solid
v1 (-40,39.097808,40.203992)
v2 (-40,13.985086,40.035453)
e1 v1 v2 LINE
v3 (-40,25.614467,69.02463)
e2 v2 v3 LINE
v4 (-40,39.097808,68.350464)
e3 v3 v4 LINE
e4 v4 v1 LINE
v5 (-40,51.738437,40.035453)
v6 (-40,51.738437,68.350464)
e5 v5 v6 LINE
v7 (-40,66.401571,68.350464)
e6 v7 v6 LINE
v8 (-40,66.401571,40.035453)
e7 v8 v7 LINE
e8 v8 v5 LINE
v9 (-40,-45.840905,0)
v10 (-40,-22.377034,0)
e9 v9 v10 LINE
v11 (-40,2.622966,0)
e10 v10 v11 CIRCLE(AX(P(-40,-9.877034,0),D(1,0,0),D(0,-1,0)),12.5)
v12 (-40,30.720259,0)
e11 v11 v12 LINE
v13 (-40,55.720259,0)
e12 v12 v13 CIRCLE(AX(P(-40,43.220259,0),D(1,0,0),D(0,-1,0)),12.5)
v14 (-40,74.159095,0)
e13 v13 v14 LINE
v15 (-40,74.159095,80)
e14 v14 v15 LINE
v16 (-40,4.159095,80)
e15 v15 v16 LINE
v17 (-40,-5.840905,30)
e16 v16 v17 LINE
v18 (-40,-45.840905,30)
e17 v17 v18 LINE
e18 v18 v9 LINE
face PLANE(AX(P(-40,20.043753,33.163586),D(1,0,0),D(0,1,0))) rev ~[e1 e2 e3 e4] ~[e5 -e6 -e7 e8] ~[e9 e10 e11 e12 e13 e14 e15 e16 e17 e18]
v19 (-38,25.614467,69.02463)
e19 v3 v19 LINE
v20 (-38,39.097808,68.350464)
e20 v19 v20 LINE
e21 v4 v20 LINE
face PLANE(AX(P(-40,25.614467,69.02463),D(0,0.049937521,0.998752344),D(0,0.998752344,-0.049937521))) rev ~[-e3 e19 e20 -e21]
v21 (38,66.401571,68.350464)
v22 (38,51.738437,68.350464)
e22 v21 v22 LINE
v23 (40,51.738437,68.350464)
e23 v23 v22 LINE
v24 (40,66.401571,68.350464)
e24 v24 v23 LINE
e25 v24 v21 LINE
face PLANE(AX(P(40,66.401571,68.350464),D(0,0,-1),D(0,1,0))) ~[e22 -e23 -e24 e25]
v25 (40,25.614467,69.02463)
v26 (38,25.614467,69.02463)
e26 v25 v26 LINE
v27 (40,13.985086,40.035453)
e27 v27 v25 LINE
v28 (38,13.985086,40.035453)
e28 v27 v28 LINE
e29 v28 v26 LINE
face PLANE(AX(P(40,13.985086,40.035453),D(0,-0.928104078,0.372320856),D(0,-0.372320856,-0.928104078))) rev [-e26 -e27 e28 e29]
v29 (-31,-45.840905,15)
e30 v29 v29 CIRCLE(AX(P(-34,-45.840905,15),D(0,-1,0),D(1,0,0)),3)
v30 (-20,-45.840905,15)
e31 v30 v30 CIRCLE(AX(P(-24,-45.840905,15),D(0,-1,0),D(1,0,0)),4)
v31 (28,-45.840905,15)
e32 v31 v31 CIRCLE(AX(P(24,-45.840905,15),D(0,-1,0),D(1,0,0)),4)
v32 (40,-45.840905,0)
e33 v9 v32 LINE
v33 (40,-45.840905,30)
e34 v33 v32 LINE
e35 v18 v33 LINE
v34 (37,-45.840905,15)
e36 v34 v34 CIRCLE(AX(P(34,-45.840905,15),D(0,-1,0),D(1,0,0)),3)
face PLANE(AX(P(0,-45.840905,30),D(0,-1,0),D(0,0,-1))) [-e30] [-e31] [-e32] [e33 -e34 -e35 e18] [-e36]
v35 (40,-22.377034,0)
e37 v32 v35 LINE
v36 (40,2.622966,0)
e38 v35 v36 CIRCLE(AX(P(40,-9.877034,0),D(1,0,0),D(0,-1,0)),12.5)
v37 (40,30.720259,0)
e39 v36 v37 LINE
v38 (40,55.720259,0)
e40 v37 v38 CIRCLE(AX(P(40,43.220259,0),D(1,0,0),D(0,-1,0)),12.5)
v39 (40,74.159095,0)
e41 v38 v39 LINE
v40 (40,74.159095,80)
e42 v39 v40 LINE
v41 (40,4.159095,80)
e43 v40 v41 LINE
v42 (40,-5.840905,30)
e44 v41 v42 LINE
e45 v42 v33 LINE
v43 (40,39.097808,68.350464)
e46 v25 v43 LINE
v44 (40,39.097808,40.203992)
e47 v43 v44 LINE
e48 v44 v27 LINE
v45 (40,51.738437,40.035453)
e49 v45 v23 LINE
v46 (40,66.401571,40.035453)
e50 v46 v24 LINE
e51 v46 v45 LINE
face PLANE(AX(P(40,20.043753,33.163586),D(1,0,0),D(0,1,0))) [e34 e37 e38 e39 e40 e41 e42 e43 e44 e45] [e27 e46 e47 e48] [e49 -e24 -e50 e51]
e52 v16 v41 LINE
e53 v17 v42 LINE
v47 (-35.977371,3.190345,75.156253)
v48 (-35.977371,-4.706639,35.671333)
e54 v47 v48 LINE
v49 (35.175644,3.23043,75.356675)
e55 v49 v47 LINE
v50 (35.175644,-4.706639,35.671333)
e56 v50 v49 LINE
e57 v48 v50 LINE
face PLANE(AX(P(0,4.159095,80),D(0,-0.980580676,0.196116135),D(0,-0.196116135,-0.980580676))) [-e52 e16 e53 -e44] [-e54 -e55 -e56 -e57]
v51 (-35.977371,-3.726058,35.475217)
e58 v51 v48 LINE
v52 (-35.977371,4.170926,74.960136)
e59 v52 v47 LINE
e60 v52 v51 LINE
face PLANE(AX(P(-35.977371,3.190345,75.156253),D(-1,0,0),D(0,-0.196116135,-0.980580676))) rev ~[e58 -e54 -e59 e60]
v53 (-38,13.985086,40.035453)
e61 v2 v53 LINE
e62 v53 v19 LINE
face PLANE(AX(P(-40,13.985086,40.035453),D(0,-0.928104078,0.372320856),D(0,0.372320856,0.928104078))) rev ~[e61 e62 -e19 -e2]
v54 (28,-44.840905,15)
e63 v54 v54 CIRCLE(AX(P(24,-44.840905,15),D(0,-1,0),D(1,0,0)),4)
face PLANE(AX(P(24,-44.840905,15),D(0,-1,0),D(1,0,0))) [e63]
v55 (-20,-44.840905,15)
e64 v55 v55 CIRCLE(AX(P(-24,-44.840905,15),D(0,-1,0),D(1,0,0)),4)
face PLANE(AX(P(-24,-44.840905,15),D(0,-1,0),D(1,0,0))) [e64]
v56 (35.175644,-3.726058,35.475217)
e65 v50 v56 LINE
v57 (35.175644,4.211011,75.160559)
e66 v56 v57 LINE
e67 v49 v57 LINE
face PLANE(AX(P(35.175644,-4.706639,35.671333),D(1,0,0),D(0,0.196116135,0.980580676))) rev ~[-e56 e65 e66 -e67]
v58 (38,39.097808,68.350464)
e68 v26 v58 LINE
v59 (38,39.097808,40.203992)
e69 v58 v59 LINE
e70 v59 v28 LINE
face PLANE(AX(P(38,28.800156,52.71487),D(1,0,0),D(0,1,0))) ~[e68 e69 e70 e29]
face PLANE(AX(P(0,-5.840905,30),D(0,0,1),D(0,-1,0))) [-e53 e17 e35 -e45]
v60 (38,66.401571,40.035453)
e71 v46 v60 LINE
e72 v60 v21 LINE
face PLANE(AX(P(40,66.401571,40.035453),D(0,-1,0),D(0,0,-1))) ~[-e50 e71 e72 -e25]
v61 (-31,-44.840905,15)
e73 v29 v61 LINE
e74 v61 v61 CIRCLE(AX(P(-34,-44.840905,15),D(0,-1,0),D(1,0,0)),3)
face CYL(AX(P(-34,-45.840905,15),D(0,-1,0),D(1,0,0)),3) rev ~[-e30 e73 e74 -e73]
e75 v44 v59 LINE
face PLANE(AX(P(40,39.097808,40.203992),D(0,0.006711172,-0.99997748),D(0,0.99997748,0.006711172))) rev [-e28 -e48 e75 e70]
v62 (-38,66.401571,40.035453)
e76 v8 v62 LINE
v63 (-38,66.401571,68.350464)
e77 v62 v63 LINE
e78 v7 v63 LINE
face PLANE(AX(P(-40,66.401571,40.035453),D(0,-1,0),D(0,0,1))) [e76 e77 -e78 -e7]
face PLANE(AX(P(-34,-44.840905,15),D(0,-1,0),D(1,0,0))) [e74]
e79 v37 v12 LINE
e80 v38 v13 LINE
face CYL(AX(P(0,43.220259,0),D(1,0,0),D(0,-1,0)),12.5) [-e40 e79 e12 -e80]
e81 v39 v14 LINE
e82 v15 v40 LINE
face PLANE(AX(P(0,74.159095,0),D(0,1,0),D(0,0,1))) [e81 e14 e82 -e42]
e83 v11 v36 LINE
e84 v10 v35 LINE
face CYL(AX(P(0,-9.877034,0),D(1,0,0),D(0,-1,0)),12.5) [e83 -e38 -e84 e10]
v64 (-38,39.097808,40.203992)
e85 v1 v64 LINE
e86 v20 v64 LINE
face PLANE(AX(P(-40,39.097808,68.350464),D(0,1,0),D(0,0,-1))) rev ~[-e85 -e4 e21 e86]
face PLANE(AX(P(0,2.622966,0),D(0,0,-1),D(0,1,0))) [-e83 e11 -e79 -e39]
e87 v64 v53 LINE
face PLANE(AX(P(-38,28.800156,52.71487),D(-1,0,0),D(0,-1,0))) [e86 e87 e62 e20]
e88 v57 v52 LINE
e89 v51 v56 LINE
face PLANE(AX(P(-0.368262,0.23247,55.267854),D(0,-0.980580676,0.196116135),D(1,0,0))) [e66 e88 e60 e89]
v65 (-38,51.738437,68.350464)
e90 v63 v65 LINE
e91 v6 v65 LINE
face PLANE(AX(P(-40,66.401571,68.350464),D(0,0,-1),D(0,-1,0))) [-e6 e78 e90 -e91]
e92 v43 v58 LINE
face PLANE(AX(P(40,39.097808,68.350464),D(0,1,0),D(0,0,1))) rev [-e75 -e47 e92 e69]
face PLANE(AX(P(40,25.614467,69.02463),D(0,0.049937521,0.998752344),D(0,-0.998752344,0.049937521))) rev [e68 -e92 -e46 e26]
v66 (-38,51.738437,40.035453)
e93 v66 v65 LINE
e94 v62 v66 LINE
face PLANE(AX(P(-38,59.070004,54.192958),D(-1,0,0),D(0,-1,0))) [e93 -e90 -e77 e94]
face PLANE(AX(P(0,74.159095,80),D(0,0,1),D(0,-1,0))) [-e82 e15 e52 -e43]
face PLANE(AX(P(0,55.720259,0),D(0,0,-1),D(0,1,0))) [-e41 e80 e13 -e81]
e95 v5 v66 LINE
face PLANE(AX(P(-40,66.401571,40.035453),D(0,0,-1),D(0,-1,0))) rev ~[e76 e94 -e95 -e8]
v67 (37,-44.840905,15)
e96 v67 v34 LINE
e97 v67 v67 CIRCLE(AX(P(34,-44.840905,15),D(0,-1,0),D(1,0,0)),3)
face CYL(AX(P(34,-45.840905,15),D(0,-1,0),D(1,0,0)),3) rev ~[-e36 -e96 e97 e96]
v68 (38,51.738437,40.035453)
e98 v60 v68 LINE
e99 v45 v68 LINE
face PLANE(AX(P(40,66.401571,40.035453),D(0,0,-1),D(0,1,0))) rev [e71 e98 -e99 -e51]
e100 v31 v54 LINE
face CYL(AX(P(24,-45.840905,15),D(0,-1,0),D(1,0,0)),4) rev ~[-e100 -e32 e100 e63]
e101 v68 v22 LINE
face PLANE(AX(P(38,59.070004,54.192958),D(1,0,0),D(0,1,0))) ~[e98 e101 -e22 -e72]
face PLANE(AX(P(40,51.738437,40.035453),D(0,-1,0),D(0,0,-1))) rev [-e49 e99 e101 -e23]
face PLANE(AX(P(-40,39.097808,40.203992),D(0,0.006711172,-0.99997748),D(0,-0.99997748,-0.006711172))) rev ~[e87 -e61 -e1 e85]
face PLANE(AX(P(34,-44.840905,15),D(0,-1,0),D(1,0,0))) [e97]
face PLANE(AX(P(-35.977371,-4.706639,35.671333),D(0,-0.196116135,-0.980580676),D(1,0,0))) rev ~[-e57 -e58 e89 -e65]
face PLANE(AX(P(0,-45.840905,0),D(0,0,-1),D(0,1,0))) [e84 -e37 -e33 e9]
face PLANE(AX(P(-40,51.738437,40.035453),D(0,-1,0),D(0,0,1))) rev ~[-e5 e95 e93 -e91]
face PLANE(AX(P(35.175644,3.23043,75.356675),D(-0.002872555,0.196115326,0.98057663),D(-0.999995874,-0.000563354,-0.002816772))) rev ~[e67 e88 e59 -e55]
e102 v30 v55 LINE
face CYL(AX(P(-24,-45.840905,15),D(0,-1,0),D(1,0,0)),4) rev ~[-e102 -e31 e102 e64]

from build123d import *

# Parameters (mm, degrees)
F1_DEPTH = 40
F2_W     = 14.6631337702
F2_H     = 28.3150114119
F3_DEPTH = 2
F5_DEPTH = 1
F6_R     = 3
F6_R_2   = 4
F7_DEPTH = 1


# Not quite as in the source:
# - a pattern or mirror of a feature is missing from the dataset's text; its kind, count and spacing are read off the source's solid


with BuildPart() as f1:
    # F0 (on Right) → F1 (new body, symmetric)
    with BuildSketch(Plane.YZ):
        with BuildLine():
            Line((74.1590947979, 0), (74.1590947979, 80))
            Line((74.1590947979, 80), (4.1590947979, 80))
            Line((4.1590947979, 80), (-5.8409052021, 30))
            Line((-5.8409052021, 30), (-45.8409052021, 30))
            Line((-45.8409052021, 30), (-45.8409052021, 0))
            Line((-45.8409052021, 0), (-22.3770336471, 0))
            ThreePointArc((-22.3770336471, 0), (-9.8770336471, 12.5), (2.6229663529, 0))
            Line((2.6229663529, 0), (30.7202589484, 0))
            ThreePointArc((30.7202589484, 0), (43.2202589484, 12.5), (55.7202589484, 0))
            Line((55.7202589484, 0), (74.1590947979, 0))
        make_face()
        with BuildLine():
            ThreePointArc((30.7202589484, 0), (43.2202589484, -12.5), (55.7202589484, 0))
            Line((55.7202589484, 0), (30.7202589484, 0))
        make_face()
        with BuildLine():
            Line((30.7202589484, 0), (55.7202589484, 0))
            ThreePointArc((55.7202589484, 0), (43.2202589484, 12.5), (30.7202589484, 0))
        make_face()
        with BuildLine():
            ThreePointArc((-22.3770336471, 0), (-9.8770336471, -12.5), (2.6229663529, 0))
            Line((2.6229663529, 0), (-22.3770336471, 0))
        make_face()
        with BuildLine():
            Line((-22.3770336471, 0), (2.6229663529, 0))
            ThreePointArc((2.6229663529, 0), (-9.8770336471, 12.5), (-22.3770336471, 0))
        make_face()
    extrude(amount=F1_DEPTH, both=True)

    # F2 (on face) → F3 (cut)
    with BuildSketch(Plane(origin=(-40, 0, 0), x_dir=(0, -1, 0), z_dir=(-1, 0, 0))):
        Polygon((-13.9850862324, 40.0354526937), (-25.6144665182, 69.0246298909), (-39.0978083014, 68.3504641056), (-39.0978083014, 40.2039922774), align=None)
        with Locations((-59.0700041503, 54.1929583997)):
            Rectangle(F2_W, F2_H)
    f3 = extrude(amount=-F3_DEPTH, mode=Mode.SUBTRACT)

    # F3_copies: F3 across plane
    add(f3.mirror(Plane(origin=(0, 0, 0), x_dir=(0, 0, 1), z_dir=(1, 0, 0))), mode=Mode.SUBTRACT)

    # F4 (on face) → F5 (cut, symmetric)
    with BuildSketch(Plane(origin=(0, -11.3854857713, 2.2770971543), x_dir=(1, 0, 0), z_dir=(0, -0.9805806757, 0.1961161351))):
        Polygon((35.1756438613, 74.5268389583), (-35.977371037, 74.3224471807), (-35.977371037, 34.0555720031), (35.1756438613, 34.0555720031), align=None)
    extrude(amount=F5_DEPTH, both=True, mode=Mode.SUBTRACT)

    # F6 (on face) → F7 (cut, symmetric)
    with BuildSketch(Plane.XZ.offset(45.8409052021)):
        with Locations((-34, 15)):
            Circle(F6_R)
        with Locations((-24, 15)):
            Circle(F6_R_2)
        with Locations((24, 15)):
            Circle(F6_R_2)
        with Locations((34, 15)):
            Circle(F6_R)
    extrude(amount=F7_DEPTH, both=True, mode=Mode.SUBTRACT)


solid = f1.part
